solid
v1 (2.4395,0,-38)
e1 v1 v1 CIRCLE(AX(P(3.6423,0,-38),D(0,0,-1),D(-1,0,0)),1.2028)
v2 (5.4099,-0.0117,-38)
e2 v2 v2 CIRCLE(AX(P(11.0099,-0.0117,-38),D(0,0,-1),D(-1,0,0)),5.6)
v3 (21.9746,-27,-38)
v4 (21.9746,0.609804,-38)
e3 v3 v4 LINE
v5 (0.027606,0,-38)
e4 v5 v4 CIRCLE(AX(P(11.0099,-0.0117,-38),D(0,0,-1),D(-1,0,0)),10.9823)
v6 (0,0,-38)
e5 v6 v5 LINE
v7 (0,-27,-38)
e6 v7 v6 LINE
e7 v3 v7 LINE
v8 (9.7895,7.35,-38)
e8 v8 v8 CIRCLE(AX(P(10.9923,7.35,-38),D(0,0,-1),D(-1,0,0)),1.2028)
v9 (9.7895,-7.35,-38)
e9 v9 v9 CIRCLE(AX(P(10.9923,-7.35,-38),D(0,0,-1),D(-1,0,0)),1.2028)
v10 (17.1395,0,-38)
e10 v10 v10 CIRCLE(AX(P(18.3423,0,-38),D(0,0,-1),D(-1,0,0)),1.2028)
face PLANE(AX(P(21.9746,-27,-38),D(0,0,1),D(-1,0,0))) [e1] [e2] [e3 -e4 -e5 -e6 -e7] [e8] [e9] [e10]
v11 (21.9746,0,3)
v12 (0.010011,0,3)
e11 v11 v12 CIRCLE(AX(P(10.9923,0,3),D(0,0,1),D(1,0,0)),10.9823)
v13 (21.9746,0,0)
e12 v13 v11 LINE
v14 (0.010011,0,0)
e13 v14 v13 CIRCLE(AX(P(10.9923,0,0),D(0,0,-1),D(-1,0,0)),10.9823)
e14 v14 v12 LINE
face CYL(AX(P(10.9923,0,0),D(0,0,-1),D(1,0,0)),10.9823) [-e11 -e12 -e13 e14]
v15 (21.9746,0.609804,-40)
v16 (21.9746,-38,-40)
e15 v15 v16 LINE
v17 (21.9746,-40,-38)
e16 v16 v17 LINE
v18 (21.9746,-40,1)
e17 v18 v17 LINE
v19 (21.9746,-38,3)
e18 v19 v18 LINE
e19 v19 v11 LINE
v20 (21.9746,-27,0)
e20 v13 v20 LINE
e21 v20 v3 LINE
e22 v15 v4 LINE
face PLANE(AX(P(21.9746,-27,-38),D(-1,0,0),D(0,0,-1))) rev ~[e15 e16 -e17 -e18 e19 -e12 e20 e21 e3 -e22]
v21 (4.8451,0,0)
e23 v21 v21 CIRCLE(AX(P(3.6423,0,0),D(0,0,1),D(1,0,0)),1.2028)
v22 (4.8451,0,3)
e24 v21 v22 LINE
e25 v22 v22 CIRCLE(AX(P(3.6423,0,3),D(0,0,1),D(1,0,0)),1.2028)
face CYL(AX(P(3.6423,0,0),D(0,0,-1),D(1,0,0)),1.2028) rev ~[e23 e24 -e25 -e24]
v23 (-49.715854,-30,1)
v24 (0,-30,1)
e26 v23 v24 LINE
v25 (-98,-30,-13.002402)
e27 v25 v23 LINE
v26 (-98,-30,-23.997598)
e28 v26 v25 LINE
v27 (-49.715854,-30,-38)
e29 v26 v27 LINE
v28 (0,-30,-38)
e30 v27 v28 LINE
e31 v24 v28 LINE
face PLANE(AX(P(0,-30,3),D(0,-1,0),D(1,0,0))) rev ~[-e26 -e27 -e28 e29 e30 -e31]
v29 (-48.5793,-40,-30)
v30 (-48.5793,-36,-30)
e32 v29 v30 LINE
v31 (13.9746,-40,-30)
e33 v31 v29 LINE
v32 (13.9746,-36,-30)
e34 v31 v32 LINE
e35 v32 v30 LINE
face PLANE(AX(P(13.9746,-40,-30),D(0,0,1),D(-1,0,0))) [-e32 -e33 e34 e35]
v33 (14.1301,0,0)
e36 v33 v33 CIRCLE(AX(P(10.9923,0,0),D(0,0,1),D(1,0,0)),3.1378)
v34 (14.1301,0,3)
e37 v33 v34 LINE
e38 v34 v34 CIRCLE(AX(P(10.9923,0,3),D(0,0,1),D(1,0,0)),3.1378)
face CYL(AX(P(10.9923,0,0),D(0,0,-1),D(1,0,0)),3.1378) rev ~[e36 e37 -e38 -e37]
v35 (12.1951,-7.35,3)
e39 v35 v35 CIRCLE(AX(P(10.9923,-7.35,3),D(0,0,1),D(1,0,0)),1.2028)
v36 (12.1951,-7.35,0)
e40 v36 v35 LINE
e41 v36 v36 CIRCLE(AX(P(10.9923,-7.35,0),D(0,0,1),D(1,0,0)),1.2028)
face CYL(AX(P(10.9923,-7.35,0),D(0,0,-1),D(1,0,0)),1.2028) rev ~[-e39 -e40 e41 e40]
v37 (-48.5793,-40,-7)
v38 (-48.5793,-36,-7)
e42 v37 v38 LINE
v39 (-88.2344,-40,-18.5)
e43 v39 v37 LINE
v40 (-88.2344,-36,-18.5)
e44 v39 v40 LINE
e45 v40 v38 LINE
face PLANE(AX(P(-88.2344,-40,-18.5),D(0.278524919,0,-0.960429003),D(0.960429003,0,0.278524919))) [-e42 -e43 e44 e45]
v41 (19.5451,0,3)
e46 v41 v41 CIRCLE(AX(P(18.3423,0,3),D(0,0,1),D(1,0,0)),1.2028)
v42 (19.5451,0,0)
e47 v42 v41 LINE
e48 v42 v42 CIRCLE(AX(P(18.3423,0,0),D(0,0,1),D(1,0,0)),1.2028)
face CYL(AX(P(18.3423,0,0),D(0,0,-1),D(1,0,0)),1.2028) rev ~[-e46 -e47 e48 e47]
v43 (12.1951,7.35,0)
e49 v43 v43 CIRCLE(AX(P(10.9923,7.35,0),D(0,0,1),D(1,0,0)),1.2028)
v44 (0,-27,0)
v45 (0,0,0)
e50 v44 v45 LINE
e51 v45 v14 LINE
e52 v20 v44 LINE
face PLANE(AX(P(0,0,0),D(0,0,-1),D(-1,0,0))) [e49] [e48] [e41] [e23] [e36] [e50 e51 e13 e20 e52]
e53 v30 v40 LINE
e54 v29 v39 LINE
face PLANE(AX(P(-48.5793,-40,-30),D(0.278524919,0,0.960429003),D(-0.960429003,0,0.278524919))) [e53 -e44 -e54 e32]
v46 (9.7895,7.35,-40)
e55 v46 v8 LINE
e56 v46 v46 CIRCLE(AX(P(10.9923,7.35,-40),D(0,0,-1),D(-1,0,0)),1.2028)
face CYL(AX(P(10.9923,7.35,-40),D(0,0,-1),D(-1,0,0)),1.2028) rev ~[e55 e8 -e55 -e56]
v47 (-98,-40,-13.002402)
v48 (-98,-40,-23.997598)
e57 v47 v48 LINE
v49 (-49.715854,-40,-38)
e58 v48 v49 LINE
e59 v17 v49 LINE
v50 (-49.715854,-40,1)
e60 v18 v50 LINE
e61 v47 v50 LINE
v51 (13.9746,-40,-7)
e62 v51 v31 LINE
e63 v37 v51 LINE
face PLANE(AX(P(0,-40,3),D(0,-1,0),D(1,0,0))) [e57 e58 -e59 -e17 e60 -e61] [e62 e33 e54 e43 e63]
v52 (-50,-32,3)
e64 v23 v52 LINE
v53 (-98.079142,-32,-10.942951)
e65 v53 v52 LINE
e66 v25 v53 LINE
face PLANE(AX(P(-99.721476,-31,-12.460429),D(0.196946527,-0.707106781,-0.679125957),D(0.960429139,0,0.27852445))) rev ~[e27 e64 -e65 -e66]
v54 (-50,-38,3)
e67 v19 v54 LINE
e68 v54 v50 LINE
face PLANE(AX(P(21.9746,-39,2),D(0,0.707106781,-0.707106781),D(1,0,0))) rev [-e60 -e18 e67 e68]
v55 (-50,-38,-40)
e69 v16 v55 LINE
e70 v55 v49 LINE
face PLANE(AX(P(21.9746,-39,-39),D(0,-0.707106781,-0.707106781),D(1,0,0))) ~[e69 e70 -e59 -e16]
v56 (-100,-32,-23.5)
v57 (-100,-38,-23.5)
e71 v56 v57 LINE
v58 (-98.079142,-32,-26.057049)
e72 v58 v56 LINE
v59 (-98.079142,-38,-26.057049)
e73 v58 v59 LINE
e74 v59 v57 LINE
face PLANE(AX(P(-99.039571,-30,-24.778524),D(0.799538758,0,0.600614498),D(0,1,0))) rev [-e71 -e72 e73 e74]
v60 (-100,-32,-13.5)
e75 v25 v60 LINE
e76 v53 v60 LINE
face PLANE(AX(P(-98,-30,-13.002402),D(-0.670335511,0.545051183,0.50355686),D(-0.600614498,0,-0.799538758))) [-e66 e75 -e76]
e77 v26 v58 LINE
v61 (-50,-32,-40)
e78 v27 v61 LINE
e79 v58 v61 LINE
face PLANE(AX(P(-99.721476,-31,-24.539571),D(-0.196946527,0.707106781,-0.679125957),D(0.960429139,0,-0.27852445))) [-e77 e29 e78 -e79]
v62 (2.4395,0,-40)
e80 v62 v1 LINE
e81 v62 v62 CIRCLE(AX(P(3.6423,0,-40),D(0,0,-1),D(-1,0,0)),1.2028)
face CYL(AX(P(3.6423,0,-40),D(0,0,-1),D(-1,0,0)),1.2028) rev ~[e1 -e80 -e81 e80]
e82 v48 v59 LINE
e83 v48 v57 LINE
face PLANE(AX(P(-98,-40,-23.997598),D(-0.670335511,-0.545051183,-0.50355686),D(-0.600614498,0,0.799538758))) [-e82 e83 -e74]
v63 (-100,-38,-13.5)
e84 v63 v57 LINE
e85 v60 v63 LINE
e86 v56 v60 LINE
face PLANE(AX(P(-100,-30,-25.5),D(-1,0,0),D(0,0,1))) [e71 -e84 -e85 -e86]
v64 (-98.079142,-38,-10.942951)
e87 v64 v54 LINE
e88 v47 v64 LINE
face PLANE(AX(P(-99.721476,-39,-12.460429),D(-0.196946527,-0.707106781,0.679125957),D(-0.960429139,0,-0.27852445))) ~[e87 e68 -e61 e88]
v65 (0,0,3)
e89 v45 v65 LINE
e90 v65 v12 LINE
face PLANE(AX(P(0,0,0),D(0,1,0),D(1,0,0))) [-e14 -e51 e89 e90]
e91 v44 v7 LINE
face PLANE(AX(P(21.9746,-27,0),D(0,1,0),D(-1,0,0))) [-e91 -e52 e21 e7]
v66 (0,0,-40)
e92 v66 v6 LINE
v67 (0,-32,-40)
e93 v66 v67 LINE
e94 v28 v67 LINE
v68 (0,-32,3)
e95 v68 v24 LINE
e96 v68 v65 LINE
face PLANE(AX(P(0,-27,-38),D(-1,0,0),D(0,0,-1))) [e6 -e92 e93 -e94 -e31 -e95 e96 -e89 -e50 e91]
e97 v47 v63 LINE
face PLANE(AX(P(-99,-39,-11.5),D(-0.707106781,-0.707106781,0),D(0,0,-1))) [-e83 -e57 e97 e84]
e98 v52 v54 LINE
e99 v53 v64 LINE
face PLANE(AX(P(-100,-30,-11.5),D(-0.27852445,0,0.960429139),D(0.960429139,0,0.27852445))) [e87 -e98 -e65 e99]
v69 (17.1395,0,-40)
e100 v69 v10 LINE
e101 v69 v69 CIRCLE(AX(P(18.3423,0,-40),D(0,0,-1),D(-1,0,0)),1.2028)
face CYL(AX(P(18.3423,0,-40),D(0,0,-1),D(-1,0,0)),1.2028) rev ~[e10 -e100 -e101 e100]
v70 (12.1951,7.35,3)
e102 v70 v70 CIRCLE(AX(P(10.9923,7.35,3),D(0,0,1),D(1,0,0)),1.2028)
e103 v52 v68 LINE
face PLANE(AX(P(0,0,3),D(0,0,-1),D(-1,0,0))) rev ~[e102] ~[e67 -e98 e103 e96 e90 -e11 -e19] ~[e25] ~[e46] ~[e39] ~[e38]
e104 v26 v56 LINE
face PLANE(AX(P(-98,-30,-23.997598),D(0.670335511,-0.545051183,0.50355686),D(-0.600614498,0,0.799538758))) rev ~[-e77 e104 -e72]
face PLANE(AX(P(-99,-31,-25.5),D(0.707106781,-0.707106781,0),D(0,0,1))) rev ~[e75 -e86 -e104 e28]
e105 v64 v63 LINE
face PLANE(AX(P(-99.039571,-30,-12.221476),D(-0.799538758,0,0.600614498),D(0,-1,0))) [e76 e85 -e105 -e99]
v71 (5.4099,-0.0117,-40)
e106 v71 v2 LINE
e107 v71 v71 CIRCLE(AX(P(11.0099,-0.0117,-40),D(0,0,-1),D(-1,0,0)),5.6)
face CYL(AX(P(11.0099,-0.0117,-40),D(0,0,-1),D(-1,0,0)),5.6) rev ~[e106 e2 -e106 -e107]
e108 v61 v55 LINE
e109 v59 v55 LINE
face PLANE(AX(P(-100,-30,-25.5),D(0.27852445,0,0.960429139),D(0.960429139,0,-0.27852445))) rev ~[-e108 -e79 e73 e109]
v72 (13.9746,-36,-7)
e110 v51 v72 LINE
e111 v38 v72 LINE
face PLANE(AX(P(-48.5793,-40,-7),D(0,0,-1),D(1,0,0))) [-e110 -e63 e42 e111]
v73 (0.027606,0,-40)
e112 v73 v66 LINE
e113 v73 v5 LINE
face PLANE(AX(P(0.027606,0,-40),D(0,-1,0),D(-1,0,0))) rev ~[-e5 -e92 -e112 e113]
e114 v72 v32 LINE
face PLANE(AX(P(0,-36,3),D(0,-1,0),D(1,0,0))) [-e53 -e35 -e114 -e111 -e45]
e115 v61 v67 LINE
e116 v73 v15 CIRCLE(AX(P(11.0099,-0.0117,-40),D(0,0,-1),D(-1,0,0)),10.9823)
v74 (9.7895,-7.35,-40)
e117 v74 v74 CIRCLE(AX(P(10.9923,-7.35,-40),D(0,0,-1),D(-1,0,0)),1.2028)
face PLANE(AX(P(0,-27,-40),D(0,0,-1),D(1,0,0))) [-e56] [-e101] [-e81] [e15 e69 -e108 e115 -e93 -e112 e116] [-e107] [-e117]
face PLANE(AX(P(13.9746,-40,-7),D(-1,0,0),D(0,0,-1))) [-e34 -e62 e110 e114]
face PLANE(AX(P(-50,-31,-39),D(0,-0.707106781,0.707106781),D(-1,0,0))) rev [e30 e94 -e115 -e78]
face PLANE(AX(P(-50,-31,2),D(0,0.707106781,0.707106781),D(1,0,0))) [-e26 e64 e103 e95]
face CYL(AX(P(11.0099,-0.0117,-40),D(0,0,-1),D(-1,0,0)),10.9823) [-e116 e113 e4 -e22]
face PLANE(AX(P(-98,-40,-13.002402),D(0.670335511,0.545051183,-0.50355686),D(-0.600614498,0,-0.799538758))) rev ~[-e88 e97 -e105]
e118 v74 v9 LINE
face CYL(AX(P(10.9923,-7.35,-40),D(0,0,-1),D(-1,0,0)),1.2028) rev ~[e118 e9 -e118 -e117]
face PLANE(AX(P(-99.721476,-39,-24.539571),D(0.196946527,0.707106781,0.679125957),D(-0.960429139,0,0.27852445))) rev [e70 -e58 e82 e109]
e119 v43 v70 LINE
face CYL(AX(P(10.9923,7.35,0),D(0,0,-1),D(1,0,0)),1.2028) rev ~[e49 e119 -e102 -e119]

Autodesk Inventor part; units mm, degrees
ref_plane "YZ Plane" through (0, 0, 0) normal (1, 0, 0) x (0, 1, 0)
ref_plane "XZ Plane" through (0, 0, 0) normal (0, 1, 0) x (-1, 0, 0)
ref_plane "XY Plane" through (0, 0, 0) normal (0, 0, 1) x (1, 0, 0)
ref_plane "Plano de trabajo1" through (0, 0, 0) normal (0, 0, 1) x (1, 0, 0)
sketch "Boceto1" plane through (0, 0, 0) normal (0, 0, 1) x (1, 0, 0)
  circle A0 centre (10.9923, 0) radius 10.9823 projected
  circle A1 centre (10.9923, 0) radius 3.1378 projected
  circle A2 centre (18.3423, 0) radius 1.2028 projected
  circle A3 centre (10.9923, 7.35) radius 1.2028 projected
  circle A4 centre (3.6423, 0) radius 1.2028 projected
  circle A5 centre (10.9923, -7.35) radius 1.2028 projected
  line L0 (0, 0) -> (0, 30)
  line L1 (21.9746, 0) -> (21.9746, -30)
  line L2 (0, 0) -> (0, -30)
  line L3 (0, -30) -> (21.9746, -30)
  circle A6 centre (10.9923, 0) radius 3.1378
  circle A7 centre (18.3423, 0) radius 1.2028
  circle A8 centre (10.9923, -7.35) radius 1.2028
  circle A9 centre (3.6423, 0) radius 1.2028
  circle A10 centre (10.9923, 7.35) radius 1.2028
  circle A11 centre (10.9923, 0) radius 10.9823
  line L4 (0, 0) -> (0, -30)
  line L5 (0, -30) -> (21.9746, -30)
  line L6 (21.9746, -30) -> (21.9746, 0)
  dimension "d0" = 30
  dimension "d1" = 30
extrude "Extrusión1" add sketch "Boceto1" along normal blind 3
sketch "Boceto2" plane through (10.9923, 0, 3) normal (0, 0, 1) x (1, 0, 0)
  circle A0 centre (0, 0) radius 10.9823 projected
  line L0 (10.9823, 0) -> (10.9823, -30)
  line L1 (10.9823, -30) -> (-9.7118, -30)
  line L2 (-9.7118, -30) -> (-10.9923, 0)
  circle A1 centre (0, 0) radius 10.9823 projected
  circle A2 centre (0, -7.35) radius 1.2028 projected
  circle A3 centre (-7.35, 0) radius 1.2028 projected
  circle A4 centre (0, 7.35) radius 1.2028 projected
  circle A5 centre (7.35, 0) radius 1.2028 projected
  circle A6 centre (0, 0) radius 3.1378 projected
  point P0 (-10.9723, -0.4683)
  dimension "d4" = 30
extrude "Extrusión2" add sketch "Boceto2" against normal blind 3 contours L0 L1 L2 A0
sketch "Boceto3" plane through (0, 0, 0) normal (0, 0, -1) x (-1, 0, 0)
  point P0 (0, 0)
sketch "Boceto4" plane through (0, 0, 3) normal (0, 0, 1) x (1, 0, 0)
  point P0 (0, 0)
sketch "Boceto5" plane through (0, 0, 0) normal (0, 0, -1) x (-1, 0, 0)
  arc A0 (-0.02, -0.4683) -> (-21.9746, 0) centre (-10.9923, 0) ccw projected
  line L0 (-21.9746, 0) -> (-21.9746, -30) projected
  line L1 (-21.9746, -30) -> (-1.2805, -30) projected
  line L2 (-1.2805, -30) -> (-0.02, -0.4683) projected
  circle A1 centre (-10.9923, -7.35) radius 1.2028 projected
  circle A2 centre (-3.6423, 0) radius 1.2028 projected
  circle A3 centre (-10.9923, 7.35) radius 1.2028 projected
  circle A4 centre (-18.3423, 0) radius 1.2028 projected
  circle A5 centre (-10.9923, 0) radius 3.1378 projected
  line L3 (-21.9746, -30) -> (0, -30)
  line L4 (0, -30) -> (0, 0)
  line L5 (0, 0) -> (-21.9746, 0)
  line L6 (-21.9746, 0) -> (-21.9746, -30)
  point P0 (-0.01, 0)
extrude "Extrusión3" add sketch "Boceto5" against normal blind 3 contours A0 L5 L4 L3 L2
sketch "Boceto6" plane through (0, 0, 0) normal (0, 0, -1) x (-1, 0, 0)
  point P0 (0, 0)
sketch "Boceto7" plane through (0, 0, 0) normal (0, 0, -1) x (-1, 0, 0)
  line L0 (-21.9746, -30) -> (0, -30) projected
  line L1 (-21.9746, -30) -> (-21.9746, 0) projected
  line L2 (0, -30) -> (-21.9746, -30)
  line L3 (-21.9746, -30) -> (-21.9746, -27)
  line L4 (-21.9746, -27) -> (0, -27)
  line L5 (0, -27) -> (0, -30)
  point P0 (0, 0)
  dimension "d9" = 3
extrude "Extrusión4" add sketch "Boceto7" along normal blind 40
sketch "Boceto8" plane through (0, -27, 0) normal (0, 1, 0) x (1, 0, 0)
  line L0 (0, -3) -> (0, 40) projected
  line L1 (21.9746, -3) -> (21.9746, 40) projected
  line L2 (0, 40) -> (21.9746, 40)
  line L3 (21.9746, 40) -> (21.9746, 38)
  line L4 (21.9746, 38) -> (0, 38)
  line L5 (0, 38) -> (0, 40)
  point P0 (0, 0)
  point P1 (21.9746, 40)
  point P2 (0, 38)
  dimension "d12" = 2
extrude "Extrusión5" add sketch "Boceto8" along normal blind 40
sketch "Boceto9" plane through (0, 0, -40) normal (0, 0, -1) x (-1, 0, 0)
  circle A0 centre (-11.0072, -0.015) radius 2.7 projected
  circle A1 centre (-11.0099, -0.0117) radius 10.9823 projected
  circle A2 centre (-18.3423, 0) radius 1.2028 projected
  circle A3 centre (-10.9923, -7.35) radius 1.2028 projected
  circle A4 centre (-10.9923, 7.35) radius 1.2028 projected
  circle A5 centre (-3.6423, 0) radius 1.2028 projected
  line L0 (-21.9746, -30) -> (-21.9746, 13) projected
  line L1 (-21.9746, -30) -> (0, -30) projected
  line L2 (0, -30) -> (0, 13) projected
  line L3 (-21.9746, 13) -> (0, 13) projected
  line L4 (-21.5706, 0) -> (-25.972, 0)
  line L5 (-25.972, 0) -> (-25.972, 18.1609)
  line L6 (-25.972, 18.1609) -> (4.5124, 18.1609)
  line L7 (4.5124, 18.1609) -> (4.5124, 1.2028)
  line L8 (4.5124, 1.2028) -> (4.5124, 0)
  line L9 (-3.6423, 0) -> (4.822, 0)
  point P0 (0, 0)
  point P1 (-21.9746, 0.6093)
  point P2 (-0.0276, 0)
  point P3 (0, 0)
extrude "Extrusión6" cut sketch "Boceto9" against normal blind 40 contours A0 | A1 L0 L3 L2 L9 | A2 | A3 | A4 | A5
sketch "Boceto10" plane through (0, -30, 3) normal (0, -1, 0) x (1, 0, 0)
  point P0 (0, -3)
sketch "Boceto11" plane through (0, -30, 3) normal (0, -1, 0) x (1, 0, 0)
  line L0 (0.0276, -43) -> (21.9746, -43) projected
  line L1 (0, -3) -> (0, 0) projected
  line L2 (21.9746, -43) -> (0, -43)
  line L3 (0, -43) -> (0, 0)
  line L4 (0, 0) -> (21.9746, 0)
  line L5 (21.9746, 0) -> (21.9746, -43)
  line L6 (0, -43) -> (-100, -43)
  line L7 (-100, -43) -> (-100, 0)
  line L8 (-100, 0) -> (0, 0)
  line L9 (0, 0) -> (0, -43)
  line L10 (-100, 0) -> (-100, -21.5)
  line L11 (-100, -21.5) -> (-100, -14.5)
  line L12 (-100, -14.5) -> (-100, -28.5)
  line L13 (-100, -28.5) -> (-50, -43)
  line L14 (-50, -43) -> (-50, 0)
  line L15 (-100, -14.5) -> (-50, 0)
  dimension "d17" = 100
  dimension "d18" = 21.5
  dimension "d19" = 7
  dimension "d20" = 14
extrude "Extrusión7" add sketch "Boceto11" along normal blind 10 contours L2 L3 L1 L4 L5 L0 | L6 L14 L8 L1 L3 | L13 L7 L15 L14
chamfer "Chaflán1" distance 2 angle 45 12 edges at (-14.0127, -40, -40) (-75, -40, -32.75) (-75, -30, -32.75) (-25, -30, -40) (-14.0127, -40, 3) (-75, -40, -4.25) (-100, -40, -18.5) (-75, -30, -4.25) (-25, -30, 3) (-100, -30, -18.5) (-100, -35, -25.5) (-100, -35, -11.5)
sketch "Boceto12" plane through (0, -40, 3) normal (0, -1, 0) x (1, 0, 0)
  line L0 (-49.7159, -2) -> (21.9746, -2) projected
  line L1 (-98, -16.0024) -> (-49.7159, -2) projected
  line L2 (-98, -26.9976) -> (-98, -16.0024) projected
  line L3 (-49.7159, -41) -> (-98, -26.9976) projected
  line L4 (21.9746, -41) -> (-49.7159, -41) projected
  line L5 (21.9746, -41) -> (21.9746, -2) projected
  line L6 (-48.5793, -33) -> (-88.2344, -21.5)
  line L7 (-88.2344, -21.5) -> (-48.5793, -10)
  line L8 (-48.5793, -10) -> (13.9746, -10)
  line L9 (13.9746, -10) -> (13.9746, -33)
  line L10 (13.9746, -33) -> (-48.5793, -33)
  point P0 (0, -3)
  dimension "d26" = 8
extrude "Extrusión8" cut sketch "Boceto12" against normal blind 4 contours L6 L7 L8 L9 L10
sketch "Boceto13" plane through (0, 0, -40) normal (0, 0, -1) x (-1, 0, 0)
  circle A0 centre (-11.0099, -0.0117) radius 5.6 projected
  circle A1 centre (-11.0072, -0.015) radius 2.7 projected
  point P0 (0, 0)
extrude "Extrusión9" cut sketch "Boceto13" against normal blind 5
properties part number "tibia"
